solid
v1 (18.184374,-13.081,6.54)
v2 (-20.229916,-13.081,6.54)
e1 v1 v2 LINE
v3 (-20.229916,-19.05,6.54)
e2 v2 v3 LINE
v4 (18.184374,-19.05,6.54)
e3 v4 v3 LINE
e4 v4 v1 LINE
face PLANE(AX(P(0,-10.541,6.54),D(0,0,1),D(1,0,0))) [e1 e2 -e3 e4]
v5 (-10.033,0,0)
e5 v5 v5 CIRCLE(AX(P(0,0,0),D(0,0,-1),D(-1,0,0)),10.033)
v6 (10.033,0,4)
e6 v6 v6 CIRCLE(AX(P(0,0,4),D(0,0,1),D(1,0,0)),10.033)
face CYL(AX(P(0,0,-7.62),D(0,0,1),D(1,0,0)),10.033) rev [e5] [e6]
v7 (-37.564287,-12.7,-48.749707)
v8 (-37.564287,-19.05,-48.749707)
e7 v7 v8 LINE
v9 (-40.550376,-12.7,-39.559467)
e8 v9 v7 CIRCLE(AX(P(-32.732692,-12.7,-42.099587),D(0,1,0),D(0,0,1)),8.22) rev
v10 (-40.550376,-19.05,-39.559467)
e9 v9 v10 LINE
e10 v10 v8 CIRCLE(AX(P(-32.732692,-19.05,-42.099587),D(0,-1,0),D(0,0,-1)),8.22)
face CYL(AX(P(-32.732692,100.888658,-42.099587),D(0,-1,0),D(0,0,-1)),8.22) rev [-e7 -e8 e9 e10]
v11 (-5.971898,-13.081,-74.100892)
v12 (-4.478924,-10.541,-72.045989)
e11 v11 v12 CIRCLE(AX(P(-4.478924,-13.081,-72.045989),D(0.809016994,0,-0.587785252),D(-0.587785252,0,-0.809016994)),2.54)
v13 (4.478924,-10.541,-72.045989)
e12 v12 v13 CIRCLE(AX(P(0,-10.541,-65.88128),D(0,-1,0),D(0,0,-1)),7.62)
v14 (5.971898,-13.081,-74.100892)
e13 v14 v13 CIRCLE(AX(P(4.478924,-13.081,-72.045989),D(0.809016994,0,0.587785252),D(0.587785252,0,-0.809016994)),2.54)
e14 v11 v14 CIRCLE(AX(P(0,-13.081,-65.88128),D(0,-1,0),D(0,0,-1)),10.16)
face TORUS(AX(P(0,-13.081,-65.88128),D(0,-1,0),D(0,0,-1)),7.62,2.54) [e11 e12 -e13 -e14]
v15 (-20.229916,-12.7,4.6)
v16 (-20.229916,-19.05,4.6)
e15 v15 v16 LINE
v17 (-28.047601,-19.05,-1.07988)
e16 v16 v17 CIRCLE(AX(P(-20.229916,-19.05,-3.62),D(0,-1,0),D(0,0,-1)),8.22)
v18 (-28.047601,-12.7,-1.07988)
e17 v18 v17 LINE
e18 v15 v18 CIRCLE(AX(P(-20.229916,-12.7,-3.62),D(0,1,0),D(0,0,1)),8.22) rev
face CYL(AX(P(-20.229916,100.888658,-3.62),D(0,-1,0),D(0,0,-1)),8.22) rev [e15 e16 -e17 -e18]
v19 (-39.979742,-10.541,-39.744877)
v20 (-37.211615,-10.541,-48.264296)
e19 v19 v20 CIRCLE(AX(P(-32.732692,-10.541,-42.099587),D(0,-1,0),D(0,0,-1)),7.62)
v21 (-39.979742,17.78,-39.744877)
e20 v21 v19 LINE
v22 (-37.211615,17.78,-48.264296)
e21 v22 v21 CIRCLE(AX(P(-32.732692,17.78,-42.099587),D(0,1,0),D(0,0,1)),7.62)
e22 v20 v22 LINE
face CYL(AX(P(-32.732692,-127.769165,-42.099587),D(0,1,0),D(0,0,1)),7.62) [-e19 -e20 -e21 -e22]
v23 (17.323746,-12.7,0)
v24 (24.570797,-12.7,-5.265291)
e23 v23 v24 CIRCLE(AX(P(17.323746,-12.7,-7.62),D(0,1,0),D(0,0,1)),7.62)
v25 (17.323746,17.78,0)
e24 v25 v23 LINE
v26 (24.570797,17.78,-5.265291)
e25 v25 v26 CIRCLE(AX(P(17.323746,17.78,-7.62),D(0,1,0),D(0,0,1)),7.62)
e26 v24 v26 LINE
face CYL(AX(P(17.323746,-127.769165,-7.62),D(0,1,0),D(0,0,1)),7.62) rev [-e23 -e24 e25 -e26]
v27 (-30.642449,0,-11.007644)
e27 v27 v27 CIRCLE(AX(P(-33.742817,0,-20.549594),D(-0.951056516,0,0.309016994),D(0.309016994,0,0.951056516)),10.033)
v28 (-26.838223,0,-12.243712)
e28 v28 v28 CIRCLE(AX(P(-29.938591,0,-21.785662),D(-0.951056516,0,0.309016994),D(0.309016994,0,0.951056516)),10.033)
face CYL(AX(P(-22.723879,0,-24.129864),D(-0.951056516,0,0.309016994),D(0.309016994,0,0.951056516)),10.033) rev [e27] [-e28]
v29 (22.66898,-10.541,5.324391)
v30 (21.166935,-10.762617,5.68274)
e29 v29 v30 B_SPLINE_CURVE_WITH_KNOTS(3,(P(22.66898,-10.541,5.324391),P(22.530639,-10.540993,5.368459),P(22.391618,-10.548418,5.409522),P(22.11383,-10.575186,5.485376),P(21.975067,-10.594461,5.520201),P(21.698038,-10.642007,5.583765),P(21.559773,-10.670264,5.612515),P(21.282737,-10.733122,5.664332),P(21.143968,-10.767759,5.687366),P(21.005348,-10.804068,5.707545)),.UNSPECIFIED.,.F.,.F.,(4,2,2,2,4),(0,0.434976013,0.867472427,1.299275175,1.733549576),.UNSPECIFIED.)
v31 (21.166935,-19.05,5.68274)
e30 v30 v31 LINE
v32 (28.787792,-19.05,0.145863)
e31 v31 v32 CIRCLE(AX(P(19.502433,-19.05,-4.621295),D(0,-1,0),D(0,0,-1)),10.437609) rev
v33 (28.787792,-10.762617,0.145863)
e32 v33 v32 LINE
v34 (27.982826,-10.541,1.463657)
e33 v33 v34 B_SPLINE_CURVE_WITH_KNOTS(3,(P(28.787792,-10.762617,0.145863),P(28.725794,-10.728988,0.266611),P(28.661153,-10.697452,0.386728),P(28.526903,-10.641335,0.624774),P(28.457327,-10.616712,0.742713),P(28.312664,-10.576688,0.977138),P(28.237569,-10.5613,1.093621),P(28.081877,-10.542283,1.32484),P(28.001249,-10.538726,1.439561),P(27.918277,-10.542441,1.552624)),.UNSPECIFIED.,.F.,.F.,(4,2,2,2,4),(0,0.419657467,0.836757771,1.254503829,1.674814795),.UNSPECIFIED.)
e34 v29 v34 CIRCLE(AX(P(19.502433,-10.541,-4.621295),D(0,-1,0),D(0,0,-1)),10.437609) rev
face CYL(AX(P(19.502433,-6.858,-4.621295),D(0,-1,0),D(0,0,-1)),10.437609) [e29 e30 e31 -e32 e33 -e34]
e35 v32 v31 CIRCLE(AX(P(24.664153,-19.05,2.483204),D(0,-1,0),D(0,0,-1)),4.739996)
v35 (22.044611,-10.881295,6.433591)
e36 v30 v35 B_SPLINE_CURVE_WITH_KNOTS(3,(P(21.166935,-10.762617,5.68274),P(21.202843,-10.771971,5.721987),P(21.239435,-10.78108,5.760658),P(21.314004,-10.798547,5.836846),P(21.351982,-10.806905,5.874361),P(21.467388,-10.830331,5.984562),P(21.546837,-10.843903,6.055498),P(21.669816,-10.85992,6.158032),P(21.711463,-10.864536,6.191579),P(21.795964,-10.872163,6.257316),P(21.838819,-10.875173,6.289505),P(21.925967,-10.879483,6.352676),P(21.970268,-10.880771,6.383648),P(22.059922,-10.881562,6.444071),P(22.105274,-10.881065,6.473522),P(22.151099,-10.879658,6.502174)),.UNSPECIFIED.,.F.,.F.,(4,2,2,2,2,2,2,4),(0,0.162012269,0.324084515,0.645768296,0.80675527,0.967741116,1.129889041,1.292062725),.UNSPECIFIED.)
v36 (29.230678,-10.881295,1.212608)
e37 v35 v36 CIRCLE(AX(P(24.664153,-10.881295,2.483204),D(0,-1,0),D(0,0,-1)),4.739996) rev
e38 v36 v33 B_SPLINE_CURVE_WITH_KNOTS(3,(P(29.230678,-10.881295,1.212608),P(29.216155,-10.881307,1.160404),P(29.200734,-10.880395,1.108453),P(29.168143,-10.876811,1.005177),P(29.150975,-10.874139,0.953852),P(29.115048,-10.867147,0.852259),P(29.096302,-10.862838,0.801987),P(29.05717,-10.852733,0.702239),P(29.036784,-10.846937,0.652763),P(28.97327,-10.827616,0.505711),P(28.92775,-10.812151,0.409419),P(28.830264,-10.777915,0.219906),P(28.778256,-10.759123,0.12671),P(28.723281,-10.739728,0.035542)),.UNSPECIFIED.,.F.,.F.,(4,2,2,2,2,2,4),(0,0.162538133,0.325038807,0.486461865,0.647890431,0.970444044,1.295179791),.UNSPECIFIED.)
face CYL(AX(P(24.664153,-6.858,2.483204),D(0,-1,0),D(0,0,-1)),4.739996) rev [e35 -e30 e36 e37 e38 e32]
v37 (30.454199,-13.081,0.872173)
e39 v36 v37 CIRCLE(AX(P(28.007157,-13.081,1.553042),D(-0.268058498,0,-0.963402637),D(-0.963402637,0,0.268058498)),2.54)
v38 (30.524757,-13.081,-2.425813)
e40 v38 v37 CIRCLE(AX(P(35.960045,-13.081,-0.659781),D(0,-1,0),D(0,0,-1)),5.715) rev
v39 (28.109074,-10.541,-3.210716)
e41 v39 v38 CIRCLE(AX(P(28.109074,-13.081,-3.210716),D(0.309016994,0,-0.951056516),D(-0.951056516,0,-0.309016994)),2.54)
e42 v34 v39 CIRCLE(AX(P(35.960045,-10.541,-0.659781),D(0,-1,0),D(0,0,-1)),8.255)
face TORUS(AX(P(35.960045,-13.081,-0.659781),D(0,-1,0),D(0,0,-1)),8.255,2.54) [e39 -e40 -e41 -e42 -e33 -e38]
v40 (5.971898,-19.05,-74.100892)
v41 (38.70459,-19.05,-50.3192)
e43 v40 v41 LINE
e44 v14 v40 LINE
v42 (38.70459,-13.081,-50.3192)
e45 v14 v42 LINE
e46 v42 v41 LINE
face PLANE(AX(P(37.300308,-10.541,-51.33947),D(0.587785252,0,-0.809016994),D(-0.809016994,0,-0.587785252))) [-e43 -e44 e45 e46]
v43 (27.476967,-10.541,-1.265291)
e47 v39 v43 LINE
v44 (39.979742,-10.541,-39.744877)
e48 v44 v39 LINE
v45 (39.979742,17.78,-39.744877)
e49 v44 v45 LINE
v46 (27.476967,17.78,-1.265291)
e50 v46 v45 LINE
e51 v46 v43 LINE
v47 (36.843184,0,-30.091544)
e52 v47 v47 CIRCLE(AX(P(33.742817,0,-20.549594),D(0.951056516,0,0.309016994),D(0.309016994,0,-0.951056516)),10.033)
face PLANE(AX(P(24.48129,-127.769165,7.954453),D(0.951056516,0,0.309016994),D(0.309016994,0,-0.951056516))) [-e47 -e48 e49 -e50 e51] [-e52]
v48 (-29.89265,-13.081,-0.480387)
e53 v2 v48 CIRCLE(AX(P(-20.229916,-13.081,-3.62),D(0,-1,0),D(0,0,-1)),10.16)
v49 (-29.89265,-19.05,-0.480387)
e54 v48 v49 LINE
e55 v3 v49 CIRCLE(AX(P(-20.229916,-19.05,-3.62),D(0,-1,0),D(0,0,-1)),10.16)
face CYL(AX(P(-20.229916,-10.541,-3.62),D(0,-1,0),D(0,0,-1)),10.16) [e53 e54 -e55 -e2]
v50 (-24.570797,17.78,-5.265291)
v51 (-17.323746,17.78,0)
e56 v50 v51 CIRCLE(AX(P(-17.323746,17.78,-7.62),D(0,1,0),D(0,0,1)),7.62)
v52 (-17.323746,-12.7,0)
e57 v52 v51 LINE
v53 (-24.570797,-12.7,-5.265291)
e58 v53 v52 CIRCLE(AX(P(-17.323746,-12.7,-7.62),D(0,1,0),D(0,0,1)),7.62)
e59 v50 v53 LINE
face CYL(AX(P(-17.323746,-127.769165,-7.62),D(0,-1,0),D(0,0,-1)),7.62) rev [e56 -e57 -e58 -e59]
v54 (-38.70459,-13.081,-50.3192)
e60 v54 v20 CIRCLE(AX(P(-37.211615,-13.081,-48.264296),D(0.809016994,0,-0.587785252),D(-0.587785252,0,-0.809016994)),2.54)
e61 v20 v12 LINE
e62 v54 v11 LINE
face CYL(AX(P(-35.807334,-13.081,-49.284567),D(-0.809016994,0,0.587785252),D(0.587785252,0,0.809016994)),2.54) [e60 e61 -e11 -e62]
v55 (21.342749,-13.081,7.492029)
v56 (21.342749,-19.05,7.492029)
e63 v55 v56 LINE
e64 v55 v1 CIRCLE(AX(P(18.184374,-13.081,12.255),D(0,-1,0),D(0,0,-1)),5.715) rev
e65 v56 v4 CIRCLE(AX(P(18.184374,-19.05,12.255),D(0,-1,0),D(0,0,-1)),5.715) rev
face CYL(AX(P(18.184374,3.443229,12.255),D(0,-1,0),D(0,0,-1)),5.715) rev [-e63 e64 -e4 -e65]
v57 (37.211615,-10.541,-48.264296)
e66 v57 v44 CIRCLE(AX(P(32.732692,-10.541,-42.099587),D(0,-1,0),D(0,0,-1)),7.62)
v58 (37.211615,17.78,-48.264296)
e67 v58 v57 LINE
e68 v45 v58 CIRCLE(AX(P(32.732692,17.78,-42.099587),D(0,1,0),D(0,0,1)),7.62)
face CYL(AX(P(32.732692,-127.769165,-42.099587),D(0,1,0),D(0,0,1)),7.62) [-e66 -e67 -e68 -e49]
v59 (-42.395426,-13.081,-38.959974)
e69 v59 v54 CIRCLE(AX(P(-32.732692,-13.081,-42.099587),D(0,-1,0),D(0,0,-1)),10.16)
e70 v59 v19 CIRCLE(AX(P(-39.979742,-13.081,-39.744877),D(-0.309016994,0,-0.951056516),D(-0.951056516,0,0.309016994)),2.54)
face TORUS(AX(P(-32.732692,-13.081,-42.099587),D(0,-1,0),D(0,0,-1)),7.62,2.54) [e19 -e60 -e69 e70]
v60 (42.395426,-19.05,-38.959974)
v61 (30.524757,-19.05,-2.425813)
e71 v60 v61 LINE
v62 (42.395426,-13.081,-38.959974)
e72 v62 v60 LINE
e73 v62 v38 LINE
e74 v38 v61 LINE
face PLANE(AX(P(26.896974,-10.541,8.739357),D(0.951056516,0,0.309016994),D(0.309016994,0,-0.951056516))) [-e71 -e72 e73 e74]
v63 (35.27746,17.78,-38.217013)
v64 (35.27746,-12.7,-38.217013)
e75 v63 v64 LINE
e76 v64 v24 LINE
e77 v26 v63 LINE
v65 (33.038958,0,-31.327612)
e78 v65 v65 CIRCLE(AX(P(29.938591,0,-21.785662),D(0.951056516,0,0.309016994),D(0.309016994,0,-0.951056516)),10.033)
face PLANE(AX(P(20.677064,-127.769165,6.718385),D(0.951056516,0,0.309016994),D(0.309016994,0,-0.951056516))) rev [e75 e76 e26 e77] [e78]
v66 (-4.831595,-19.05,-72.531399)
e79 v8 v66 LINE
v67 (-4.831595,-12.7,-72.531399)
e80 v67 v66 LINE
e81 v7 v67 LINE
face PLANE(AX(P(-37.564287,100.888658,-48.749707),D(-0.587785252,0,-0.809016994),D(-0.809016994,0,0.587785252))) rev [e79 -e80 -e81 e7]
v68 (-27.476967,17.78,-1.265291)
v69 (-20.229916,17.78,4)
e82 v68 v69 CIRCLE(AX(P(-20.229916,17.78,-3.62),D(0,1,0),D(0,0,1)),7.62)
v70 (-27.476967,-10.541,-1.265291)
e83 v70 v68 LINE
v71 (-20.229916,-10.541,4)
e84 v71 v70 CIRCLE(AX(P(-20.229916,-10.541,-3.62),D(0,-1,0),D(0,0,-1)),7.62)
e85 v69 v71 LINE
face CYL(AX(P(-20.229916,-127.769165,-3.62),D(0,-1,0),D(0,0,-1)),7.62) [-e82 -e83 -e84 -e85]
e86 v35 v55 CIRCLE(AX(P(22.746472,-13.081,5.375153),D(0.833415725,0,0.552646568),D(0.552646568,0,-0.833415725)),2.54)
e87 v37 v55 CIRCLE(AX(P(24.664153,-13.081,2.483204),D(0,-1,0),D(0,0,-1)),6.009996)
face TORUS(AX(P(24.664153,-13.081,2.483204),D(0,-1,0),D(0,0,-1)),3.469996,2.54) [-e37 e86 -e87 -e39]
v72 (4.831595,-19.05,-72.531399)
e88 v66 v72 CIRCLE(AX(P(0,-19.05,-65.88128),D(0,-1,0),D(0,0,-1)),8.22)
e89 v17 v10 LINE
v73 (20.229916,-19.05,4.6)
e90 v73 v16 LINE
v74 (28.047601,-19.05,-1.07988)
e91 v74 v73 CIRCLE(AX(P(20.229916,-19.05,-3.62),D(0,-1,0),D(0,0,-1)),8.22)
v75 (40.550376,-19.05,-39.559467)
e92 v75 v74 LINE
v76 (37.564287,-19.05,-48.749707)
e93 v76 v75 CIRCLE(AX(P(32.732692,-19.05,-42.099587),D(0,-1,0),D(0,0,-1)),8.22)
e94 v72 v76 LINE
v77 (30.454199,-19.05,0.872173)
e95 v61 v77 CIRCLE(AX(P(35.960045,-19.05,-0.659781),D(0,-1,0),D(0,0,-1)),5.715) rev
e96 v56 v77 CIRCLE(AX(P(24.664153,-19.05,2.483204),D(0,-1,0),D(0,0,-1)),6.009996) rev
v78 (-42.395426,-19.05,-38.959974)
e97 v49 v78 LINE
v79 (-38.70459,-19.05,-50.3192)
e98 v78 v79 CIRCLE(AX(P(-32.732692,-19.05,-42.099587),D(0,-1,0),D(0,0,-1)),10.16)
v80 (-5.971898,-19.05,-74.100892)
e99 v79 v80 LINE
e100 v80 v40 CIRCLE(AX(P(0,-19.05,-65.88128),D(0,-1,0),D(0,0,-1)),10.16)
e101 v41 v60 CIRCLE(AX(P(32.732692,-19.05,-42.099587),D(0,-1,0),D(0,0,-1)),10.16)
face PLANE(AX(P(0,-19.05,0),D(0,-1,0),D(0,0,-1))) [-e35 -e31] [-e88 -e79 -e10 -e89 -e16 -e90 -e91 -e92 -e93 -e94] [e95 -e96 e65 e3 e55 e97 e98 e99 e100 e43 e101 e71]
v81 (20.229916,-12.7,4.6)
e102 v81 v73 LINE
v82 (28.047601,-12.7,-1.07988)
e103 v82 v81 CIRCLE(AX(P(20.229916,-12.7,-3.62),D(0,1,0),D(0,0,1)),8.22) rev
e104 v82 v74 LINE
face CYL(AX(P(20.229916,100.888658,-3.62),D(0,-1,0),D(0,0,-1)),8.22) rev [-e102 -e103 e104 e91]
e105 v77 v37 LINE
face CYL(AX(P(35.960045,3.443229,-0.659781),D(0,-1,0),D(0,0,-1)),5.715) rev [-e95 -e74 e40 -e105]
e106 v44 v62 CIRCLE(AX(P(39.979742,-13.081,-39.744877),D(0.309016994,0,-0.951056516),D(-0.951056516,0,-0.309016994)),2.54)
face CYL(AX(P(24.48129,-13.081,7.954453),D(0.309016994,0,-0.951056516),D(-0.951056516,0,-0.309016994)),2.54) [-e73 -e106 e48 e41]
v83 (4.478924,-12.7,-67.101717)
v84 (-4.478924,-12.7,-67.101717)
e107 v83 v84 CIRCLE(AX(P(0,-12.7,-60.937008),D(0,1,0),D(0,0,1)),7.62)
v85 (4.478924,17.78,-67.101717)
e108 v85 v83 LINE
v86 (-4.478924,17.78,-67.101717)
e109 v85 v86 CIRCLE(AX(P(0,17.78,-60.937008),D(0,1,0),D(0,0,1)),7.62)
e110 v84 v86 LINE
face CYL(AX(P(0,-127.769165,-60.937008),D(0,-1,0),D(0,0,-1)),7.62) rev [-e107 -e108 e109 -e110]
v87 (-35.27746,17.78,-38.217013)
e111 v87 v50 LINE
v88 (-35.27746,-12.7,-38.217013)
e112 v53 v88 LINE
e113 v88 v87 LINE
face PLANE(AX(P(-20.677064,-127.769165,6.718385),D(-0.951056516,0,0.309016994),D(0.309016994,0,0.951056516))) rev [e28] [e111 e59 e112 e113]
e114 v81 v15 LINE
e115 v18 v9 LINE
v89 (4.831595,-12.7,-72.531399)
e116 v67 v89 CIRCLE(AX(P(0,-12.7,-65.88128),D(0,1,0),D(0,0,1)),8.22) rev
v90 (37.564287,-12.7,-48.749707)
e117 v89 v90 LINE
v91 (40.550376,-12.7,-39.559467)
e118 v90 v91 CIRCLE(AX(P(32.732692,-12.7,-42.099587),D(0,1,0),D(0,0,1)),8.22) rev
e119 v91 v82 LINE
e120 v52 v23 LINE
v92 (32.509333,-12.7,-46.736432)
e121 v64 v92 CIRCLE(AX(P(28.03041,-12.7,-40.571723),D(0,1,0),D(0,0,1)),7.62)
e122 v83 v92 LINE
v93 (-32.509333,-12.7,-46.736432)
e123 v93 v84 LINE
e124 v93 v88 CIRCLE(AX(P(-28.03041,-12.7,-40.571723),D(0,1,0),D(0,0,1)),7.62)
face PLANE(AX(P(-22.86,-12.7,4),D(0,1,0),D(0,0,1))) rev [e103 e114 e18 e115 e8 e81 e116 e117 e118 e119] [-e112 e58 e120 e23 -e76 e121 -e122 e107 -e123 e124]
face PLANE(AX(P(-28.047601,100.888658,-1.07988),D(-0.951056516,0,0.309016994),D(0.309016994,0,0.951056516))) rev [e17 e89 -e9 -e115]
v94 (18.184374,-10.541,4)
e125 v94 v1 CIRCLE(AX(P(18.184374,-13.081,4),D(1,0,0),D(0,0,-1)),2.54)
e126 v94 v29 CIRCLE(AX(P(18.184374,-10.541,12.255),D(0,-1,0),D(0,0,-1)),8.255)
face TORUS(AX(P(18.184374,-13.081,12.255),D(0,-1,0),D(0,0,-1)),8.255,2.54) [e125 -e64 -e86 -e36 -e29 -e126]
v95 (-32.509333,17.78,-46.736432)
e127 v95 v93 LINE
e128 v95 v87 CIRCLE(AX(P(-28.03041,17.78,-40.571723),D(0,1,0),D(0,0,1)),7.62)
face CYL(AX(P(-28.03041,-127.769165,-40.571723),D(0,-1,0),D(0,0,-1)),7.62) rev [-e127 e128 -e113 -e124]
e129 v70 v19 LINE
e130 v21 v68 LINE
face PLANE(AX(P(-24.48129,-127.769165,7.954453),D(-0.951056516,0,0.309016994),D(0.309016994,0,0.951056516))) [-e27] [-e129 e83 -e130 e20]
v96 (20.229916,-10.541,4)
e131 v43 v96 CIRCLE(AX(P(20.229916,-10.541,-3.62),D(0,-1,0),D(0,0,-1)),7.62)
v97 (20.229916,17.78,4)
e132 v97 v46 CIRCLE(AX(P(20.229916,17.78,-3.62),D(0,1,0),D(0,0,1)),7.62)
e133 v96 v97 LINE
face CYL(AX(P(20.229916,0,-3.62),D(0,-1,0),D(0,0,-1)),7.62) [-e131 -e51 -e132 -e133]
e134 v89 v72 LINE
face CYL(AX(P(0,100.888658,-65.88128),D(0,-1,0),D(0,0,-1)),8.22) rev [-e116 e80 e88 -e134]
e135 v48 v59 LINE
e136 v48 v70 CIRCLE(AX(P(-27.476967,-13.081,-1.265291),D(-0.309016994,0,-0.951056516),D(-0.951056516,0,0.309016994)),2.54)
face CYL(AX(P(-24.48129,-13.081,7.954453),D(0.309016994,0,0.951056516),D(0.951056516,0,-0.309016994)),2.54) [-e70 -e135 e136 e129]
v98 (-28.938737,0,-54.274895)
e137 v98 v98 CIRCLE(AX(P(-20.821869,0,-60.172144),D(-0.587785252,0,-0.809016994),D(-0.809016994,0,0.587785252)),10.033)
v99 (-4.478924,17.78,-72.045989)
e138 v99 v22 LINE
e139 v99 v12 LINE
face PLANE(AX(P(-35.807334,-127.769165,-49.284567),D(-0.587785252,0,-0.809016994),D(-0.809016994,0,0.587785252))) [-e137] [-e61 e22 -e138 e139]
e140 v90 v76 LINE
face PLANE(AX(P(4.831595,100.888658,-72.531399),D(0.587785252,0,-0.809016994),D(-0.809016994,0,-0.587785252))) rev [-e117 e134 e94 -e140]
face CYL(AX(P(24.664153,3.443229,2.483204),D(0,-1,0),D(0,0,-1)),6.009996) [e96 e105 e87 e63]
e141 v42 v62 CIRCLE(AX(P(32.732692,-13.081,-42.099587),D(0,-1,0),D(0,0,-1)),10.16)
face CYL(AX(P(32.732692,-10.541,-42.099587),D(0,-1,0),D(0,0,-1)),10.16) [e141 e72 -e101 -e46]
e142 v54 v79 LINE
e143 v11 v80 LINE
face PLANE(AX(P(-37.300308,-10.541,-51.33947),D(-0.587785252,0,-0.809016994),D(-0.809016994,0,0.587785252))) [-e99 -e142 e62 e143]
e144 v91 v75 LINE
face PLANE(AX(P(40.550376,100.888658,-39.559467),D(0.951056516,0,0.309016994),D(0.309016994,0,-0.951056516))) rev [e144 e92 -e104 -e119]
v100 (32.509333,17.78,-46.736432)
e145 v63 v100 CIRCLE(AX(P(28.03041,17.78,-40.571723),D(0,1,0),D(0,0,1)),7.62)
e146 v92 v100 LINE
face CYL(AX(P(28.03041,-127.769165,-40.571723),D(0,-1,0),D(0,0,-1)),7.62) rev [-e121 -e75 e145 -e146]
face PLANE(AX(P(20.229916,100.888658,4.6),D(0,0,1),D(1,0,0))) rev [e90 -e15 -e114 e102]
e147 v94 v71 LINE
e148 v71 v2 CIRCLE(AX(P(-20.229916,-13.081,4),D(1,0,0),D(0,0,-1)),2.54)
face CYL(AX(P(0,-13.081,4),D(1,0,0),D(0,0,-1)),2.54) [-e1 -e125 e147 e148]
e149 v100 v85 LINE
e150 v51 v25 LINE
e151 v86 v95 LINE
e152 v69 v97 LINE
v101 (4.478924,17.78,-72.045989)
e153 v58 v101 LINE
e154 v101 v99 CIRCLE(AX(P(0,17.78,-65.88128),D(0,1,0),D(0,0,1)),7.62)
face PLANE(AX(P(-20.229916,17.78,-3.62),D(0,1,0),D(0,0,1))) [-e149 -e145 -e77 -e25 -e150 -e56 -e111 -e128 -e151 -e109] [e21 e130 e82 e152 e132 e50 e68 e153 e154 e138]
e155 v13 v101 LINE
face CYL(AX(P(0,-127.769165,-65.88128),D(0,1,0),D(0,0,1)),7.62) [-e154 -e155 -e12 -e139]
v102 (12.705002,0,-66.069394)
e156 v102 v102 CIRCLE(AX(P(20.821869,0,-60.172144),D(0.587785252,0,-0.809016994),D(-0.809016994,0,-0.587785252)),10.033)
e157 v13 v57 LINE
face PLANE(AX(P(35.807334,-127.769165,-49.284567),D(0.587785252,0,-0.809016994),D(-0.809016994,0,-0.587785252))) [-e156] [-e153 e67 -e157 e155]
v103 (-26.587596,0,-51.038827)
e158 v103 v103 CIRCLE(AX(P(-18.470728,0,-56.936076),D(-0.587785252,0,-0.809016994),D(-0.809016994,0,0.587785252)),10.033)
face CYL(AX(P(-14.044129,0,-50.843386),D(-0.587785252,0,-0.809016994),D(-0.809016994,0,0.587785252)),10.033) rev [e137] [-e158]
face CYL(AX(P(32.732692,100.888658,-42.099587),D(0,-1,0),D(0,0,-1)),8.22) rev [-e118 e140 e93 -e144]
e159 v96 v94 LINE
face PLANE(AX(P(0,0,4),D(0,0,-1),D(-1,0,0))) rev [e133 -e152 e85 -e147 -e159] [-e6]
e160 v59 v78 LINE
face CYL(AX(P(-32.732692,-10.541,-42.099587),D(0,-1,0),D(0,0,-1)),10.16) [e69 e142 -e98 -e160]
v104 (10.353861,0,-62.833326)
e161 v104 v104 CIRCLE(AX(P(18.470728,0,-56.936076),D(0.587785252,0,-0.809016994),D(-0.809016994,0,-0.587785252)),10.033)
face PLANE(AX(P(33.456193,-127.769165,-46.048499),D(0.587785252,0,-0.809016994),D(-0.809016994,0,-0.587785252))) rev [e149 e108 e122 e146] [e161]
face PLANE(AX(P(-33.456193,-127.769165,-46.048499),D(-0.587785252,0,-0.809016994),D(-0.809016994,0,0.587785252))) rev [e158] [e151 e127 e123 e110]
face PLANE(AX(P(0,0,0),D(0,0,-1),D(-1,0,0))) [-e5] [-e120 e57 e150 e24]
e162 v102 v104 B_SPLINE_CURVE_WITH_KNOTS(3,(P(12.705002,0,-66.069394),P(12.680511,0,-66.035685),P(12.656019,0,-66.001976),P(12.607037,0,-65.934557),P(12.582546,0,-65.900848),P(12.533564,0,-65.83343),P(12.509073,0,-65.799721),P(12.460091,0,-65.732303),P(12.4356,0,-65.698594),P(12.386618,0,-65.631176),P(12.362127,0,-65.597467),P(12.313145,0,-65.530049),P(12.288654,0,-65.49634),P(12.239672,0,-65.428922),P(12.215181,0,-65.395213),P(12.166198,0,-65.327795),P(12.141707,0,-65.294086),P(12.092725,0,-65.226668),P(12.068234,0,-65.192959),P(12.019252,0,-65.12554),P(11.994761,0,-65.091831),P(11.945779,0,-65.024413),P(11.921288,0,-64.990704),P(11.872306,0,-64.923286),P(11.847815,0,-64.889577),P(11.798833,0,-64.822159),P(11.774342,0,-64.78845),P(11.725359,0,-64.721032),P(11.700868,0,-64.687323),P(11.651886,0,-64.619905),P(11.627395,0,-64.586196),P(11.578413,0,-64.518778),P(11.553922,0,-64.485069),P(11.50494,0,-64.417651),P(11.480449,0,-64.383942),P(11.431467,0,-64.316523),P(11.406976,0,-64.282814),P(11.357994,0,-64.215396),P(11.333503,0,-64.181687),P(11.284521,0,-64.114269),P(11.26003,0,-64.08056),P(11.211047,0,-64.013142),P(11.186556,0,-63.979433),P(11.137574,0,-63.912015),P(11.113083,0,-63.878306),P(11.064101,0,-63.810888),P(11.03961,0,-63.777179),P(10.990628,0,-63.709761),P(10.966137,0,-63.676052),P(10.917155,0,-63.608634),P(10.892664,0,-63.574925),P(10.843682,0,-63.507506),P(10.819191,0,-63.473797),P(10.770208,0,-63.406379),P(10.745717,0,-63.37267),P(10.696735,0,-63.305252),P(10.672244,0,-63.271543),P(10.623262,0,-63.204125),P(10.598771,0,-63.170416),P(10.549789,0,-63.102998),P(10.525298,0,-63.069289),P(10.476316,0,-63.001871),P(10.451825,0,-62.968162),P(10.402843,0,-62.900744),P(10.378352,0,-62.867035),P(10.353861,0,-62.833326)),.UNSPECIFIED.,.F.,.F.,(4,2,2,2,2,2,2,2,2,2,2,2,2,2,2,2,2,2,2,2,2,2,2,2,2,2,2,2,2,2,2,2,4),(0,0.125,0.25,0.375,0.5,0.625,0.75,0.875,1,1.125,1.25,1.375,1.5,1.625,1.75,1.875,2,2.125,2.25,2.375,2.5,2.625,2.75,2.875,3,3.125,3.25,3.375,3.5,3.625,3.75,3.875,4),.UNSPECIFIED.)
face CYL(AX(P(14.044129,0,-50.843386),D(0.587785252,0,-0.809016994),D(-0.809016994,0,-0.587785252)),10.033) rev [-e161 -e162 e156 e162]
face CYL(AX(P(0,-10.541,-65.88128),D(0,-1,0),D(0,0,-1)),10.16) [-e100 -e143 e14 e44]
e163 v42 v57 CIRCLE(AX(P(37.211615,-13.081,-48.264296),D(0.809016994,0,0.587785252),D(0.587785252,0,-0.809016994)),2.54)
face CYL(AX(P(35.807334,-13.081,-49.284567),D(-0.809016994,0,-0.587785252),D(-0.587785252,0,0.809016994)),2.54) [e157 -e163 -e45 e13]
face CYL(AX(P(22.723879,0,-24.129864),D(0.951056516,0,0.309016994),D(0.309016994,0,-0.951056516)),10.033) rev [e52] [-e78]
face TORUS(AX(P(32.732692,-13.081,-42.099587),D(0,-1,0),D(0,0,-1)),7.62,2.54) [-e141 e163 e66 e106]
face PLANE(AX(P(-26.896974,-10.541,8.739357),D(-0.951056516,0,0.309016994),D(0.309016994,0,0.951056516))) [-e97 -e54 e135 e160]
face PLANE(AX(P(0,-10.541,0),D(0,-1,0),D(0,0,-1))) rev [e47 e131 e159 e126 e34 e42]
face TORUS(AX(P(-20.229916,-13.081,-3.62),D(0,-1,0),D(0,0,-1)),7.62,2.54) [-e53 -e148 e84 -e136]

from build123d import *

# Parameters (mm, degrees)
SKETCH1_W                = 45.72
SKETCH1_H                = 25.4
SKETCH1_R                = 9.75
BOSS_EXTRUDE1_DEPTH      = 4
BOSS_EXTRUDE2_DEPTH      = 25.4
SKETCH3_R                = 10.033
CUT_EXTRUDE1_DEPTH       = 11.62
CIRPATTERN1_COUNT        = 5
FILLET1_R                = 7.62
BOSS_EXTRUDE3_DEPTH      = 5.08
BOSS_EXTRUDE4_DEPTH      = 6.35
BOSS_EXTRUDE4_DEPTH_BACK = 2.159
BOSS_EXTRUDE5_START      = -8.509
BOSS_EXTRUDE5_DEPTH      = 8.509
CUT_EXTRUDE4_DEPTH       = 12.192
FILLET5_R                = 5.715
FILLET6_R                = 2.54
CUT_EXTRUDE5_DEPTH       = 6.35


with BuildPart() as part:
    # Sketch1 → Boss-Extrude1 (new body)
    with BuildSketch(Plane.XY):
        Rectangle(SKETCH1_W, SKETCH1_H)
        Circle(SKETCH1_R, mode=Mode.SUBTRACT)
    extrude(amount=BOSS_EXTRUDE1_DEPTH)

    # Sketch2 → Boss-Extrude2 (add)
    with BuildSketch(Plane(origin=(0, 12.7, 0), x_dir=(1, 0, 0), z_dir=(0, 1, 0))):
        Polygon((36.988256983, 43.482303925), (22.86, 0), (22.86, -4), (25.766170112, -4), (41.690539001, 45.01016797), (0, 75.30011757), (-41.690539001, 45.01016797), (-25.766170112, -4), (-22.86, -4), (-22.86, 0), (-36.988256983, 43.482303925), (0, 70.35584566), align=None)
    extrude(amount=-BOSS_EXTRUDE2_DEPTH)

    # Sketch3 → Cut-Extrude1 (cut)
    with BuildSketch(Plane.XY.offset(4)):
        Circle(SKETCH3_R)
    cut_extrude1 = extrude(amount=-CUT_EXTRUDE1_DEPTH, mode=Mode.SUBTRACT)

    # CirPattern1: Cut-Extrude1 ×5 about axis
    cirpattern1_axis = Axis((0, 12.7, -31.513299997), (0, -1, 0))
    for i in range(1, CIRPATTERN1_COUNT):
        add(cut_extrude1.rotate(cirpattern1_axis, i * 360 / CIRPATTERN1_COUNT), mode=Mode.SUBTRACT)

    # Fillet1
    fillet1_edges = [part.edges().sort_by_distance(p)[0] for p in [
        (0, 0, -75.30011757),
        (41.690539001, 0, -45.01016797),
        (25.766170112, 0, 4),
        (36.988256983, 0, -43.482303925),
        (0, 0, -70.35584566),
        (-36.988256983, 0, -43.482303925),
        (-25.766170112, 0, 4),
        (-41.690539001, 0, -45.01016797),
        (-22.86, 0, 0),
        (22.86, 0, 0),
    ]]
    fillet(fillet1_edges, radius=FILLET1_R)

    # Sketch6 → Boss-Extrude3 (add)
    with BuildSketch(Plane(origin=(0, 12.7, 0), x_dir=(1, 0, 0), z_dir=(0, 1, 0))):
        with BuildLine():
            Line((-20.229916049, -4), (20.229916049, -4))
            ThreePointArc((20.229916049, -4), (24.708839671, -2.544709497), (27.476966703, 1.265290503))
            Line((27.476966703, 1.265290503), (39.97974241, 39.744877467))
            ThreePointArc((39.97974241, 39.744877467), (39.97974241, 44.454296461), (37.211615379, 48.264296461))
            Line((37.211615379, 48.264296461), (4.478923622, 72.045989078))
            ThreePointArc((4.478923622, 72.045989078), (0, 73.501279581), (-4.478923622, 72.045989078))
            Line((-4.478923622, 72.045989078), (-37.211615379, 48.264296461))
            ThreePointArc((-37.211615379, 48.264296461), (-39.97974241, 44.454296461), (-39.97974241, 39.744877467))
            Line((-39.97974241, 39.744877467), (-27.476966703, 1.265290503))
            ThreePointArc((-27.476966703, 1.265290503), (-24.708839671, -2.544709497), (-20.229916049, -4))
        make_face()
        with BuildLine():
            Line((24.570796591, 5.265290503), (35.277460392, 38.217013422))
            ThreePointArc((35.277460392, 38.217013422), (35.277460392, 42.926432416), (32.50933336, 46.736432416))
            Line((32.50933336, 46.736432416), (4.478923622, 67.101717168))
            ThreePointArc((4.478923622, 67.101717168), (0, 68.557007671), (-4.478923622, 67.101717168))
            Line((-4.478923622, 67.101717168), (-32.50933336, 46.736432416))
            ThreePointArc((-32.50933336, 46.736432416), (-35.277460392, 42.926432416), (-35.277460392, 38.217013422))
            Line((-35.277460392, 38.217013422), (-24.570796591, 5.265290503))
            ThreePointArc((-24.570796591, 5.265290503), (-21.802669559, 1.455290503), (-17.323745937, 0))
            Line((-17.323745937, 0), (17.323745937, 0))
            ThreePointArc((17.323745937, 0), (21.802669559, 1.455290503), (24.570796591, 5.265290503))
        make_face(mode=Mode.SUBTRACT)
    extrude(amount=BOSS_EXTRUDE3_DEPTH)

    # Sketch8 → Boss-Extrude4 (add, two sides: drawn at the far end of the back side and taken through both)
    with BuildSketch(Plane.XZ.offset(12.7).offset(-BOSS_EXTRUDE4_DEPTH_BACK)):
        with BuildLine():
            Line((5.971898163, -74.100892244), (38.70458992, -50.319199627))
            ThreePointArc((38.70458992, -50.319199627), (42.395425962, -45.239199627), (42.395425962, -38.959974301))
            Line((42.395425962, -38.959974301), (29.892650254, -0.480387337))
            ThreePointArc((29.892650254, -0.480387337), (26.201814212, 4.599612663), (20.229916049, 6.54))
            Line((20.229916049, 6.54), (-20.229916049, 6.54))
            ThreePointArc((-20.229916049, 6.54), (-26.201814212, 4.599612663), (-29.892650254, -0.480387337))
            Line((-29.892650254, -0.480387337), (-42.395425962, -38.959974301))
            ThreePointArc((-42.395425962, -38.959974301), (-42.395425962, -45.239199627), (-38.70458992, -50.319199627))
            Line((-38.70458992, -50.319199627), (-5.971898163, -74.100892244))
            ThreePointArc((-5.971898163, -74.100892244), (0, -76.041279581), (5.971898163, -74.100892244))
        make_face()
        with BuildLine():
            Line((39.97974241, -39.744877467), (27.476966703, -1.265290503))
            ThreePointArc((27.476966703, -1.265290503), (24.708839671, 2.544709497), (20.229916049, 4))
            Line((20.229916049, 4), (-20.229916049, 4))
            ThreePointArc((-20.229916049, 4), (-24.708839671, 2.544709497), (-27.476966703, -1.265290503))
            Line((-27.476966703, -1.265290503), (-39.97974241, -39.744877467))
            ThreePointArc((-39.97974241, -39.744877467), (-39.97974241, -44.454296461), (-37.211615379, -48.264296461))
            Line((-37.211615379, -48.264296461), (-4.478923622, -72.045989078))
            ThreePointArc((-4.478923622, -72.045989078), (0, -73.501279581), (4.478923622, -72.045989078))
            Line((4.478923622, -72.045989078), (37.211615379, -48.264296461))
            ThreePointArc((37.211615379, -48.264296461), (39.97974241, -44.454296461), (39.97974241, -39.744877467))
        make_face(mode=Mode.SUBTRACT)
    extrude(amount=BOSS_EXTRUDE4_DEPTH + BOSS_EXTRUDE4_DEPTH_BACK)

    # Sketch11 → Boss-Extrude5 (add)
    with BuildSketch(Plane.XZ.offset(19.05).offset(BOSS_EXTRUDE5_START)):
        with BuildLine():
            Line((19.948787859, 5.414930333), (27.190045273, 1.56775587))
            Line((27.190045273, 1.56775587), (29.892650254, -0.480387337))
            ThreePointArc((29.892650254, -0.480387337), (26.201814212, 4.599612663), (20.229916049, 6.54))
            Line((20.229916049, 6.54), (19.948787859, 5.414930333))
        make_face()
        with BuildLine():
            ThreePointArc((20.229916049, 6.54), (28.196740294, 7.345392854), (29.892650254, -0.480387337))
            ThreePointArc((29.892650254, -0.480387337), (26.201814212, 4.599612663), (20.229916049, 6.54))
        make_face()
    extrude(amount=BOSS_EXTRUDE5_DEPTH)

    # Sketch12 → Cut-Extrude4 (cut)
    with BuildSketch(Plane.XZ.offset(19.05)):
        with BuildLine():
            ThreePointArc((28.787792432, 0.145862767), (27.450253023, 6.317941272), (21.166935135, 5.682739694))
            ThreePointArc((21.166935135, 5.682739694), (25.637505825, 3.822908801), (28.787792432, 0.145862767))
        make_face()
    extrude(amount=-CUT_EXTRUDE4_DEPTH, mode=Mode.SUBTRACT)

    # Fillet5
    fillet5_edges = [part.edges().sort_by_distance(p)[0] for p in [
        (20.229916049, -14.7955, 6.54),
        (29.892650254, -14.7955, -0.480387337),
    ]]
    fillet(fillet5_edges, radius=FILLET5_R)

    # Fillet6
    # the kernel refuses this fillet: 2.54 mm, written as the material it takes off along each edge
    with BuildSketch(Plane(origin=(32.732691756, -10.541, -42.099586964), x_dir=(0.5877852522924727, 0, -0.8090169943749478), z_dir=(-0.8090169943749478, 0, -0.5877852522924727))) as fillet6_piece_1:
        with BuildLine():
            CenterArc((10.16 - FILLET6_R, FILLET6_R), FILLET6_R, 270, 90)
            Line((10.16 - FILLET6_R, 0), (10.16, 0))
            Line((10.16, 0), (10.16, FILLET6_R))
        make_face()
    revolve(axis=Axis((32.732691756, -10.541, -42.099586964), (0, -1, 0)), revolution_arc=72, mode=Mode.SUBTRACT)
    with BuildSketch(Plane(origin=(5.971898163, -10.541, -74.100892244), x_dir=(0, -1, 0), z_dir=(0.8090169943749487, 0, 0.5877852522924716)), Plane(origin=(-38.70458992, -10.541, -50.319199627), x_dir=(0, -1, 0), z_dir=(0.8090169943749469, 0, -0.5877852522924739)), Plane(origin=(-29.892650254, -10.541, -0.480387337), x_dir=(0, -1, 0), z_dir=(-0.30901699437495056, 0, -0.9510565162951526))) as fillet6_piece_2:
        with BuildLine():
            CenterArc((FILLET6_R, -FILLET6_R), FILLET6_R, 90, 90)
            Line((0, -FILLET6_R), (0, 0))
            Line((0, 0), (FILLET6_R, 0))
        make_face()
    extrude(amount=40.459832097, mode=Mode.SUBTRACT)
    with BuildSketch(Plane(origin=(0, -10.541, -65.881279581), x_dir=(-0.5877852522924719, 0, -0.8090169943749482), z_dir=(-0.8090169943749482, 0, 0.5877852522924719))) as fillet6_piece_3:
        with BuildLine():
            CenterArc((10.16 - FILLET6_R, FILLET6_R), FILLET6_R, 270, 90)
            Line((10.16 - FILLET6_R, 0), (10.16, 0))
            Line((10.16, 0), (10.16, FILLET6_R))
        make_face()
    revolve(axis=Axis((0, -10.541, -65.881279581), (0, -1, 0)), revolution_arc=72, mode=Mode.SUBTRACT)
    with BuildSketch(Plane(origin=(-32.732691756, -10.541, -42.099586964), x_dir=(-0.9510565162951528, 0, 0.3090169943749496), z_dir=(0.3090169943749496, 0, 0.9510565162951528))) as fillet6_piece_4:
        with BuildLine():
            CenterArc((10.16 - FILLET6_R, FILLET6_R), FILLET6_R, 270, 90)
            Line((10.16 - FILLET6_R, 0), (10.16, 0))
            Line((10.16, 0), (10.16, FILLET6_R))
        make_face()
    revolve(axis=Axis((-32.732691756, -10.541, -42.099586964), (0, -1, 0)), revolution_arc=72, mode=Mode.SUBTRACT)
    with BuildSketch(Plane(origin=(-20.229916049, -10.541, -3.62), x_dir=(0, 0, 1), z_dir=(1, 0, 0))) as fillet6_piece_5:
        with BuildLine():
            CenterArc((10.16 - FILLET6_R, FILLET6_R), FILLET6_R, 270, 90)
            Line((10.16 - FILLET6_R, 0), (10.16, 0))
            Line((10.16, 0), (10.16, FILLET6_R))
        make_face()
    revolve(axis=Axis((-20.229916049, -10.541, -3.62), (0, -1, 0)), revolution_arc=72, mode=Mode.SUBTRACT)
    with BuildSketch(Plane(origin=(18.184374257, -10.541, 6.54), x_dir=(0, -1, 0), z_dir=(-1, 0, 0)), Plane(origin=(42.395425962, -10.541, -38.959974301), x_dir=(0, -1, 0), z_dir=(-0.30901699437494484, 0, 0.9510565162951544))) as fillet6_piece_6:
        with BuildLine():
            CenterArc((FILLET6_R, -FILLET6_R), FILLET6_R, 90, 90)
            Line((0, -FILLET6_R), (0, 0))
            Line((0, 0), (FILLET6_R, 0))
        make_face()
    extrude(amount=38.414290306, mode=Mode.SUBTRACT)
    with BuildSketch(Plane(origin=(18.184374257, -10.541, 12.255), x_dir=(0.5526465683039506, 0, -0.8334157249187628), z_dir=(0.8334157249187628, 0, 0.5526465683039506))) as fillet6_piece_7:
        with BuildLine():
            CenterArc((5.715 + FILLET6_R, -FILLET6_R), FILLET6_R, 90, 90)
            Line((5.715 + FILLET6_R, 0), (5.715, 0))
            Line((5.715, 0), (5.715, -FILLET6_R))
        make_face()
    revolve(axis=Axis((18.184374257, -10.541, 12.255), (0, 1, 0)), revolution_arc=33.548768752, mode=Mode.SUBTRACT)
    with BuildSketch(Plane(origin=(35.960045421, -10.541, -0.659781065), x_dir=(-0.9510565162951543, 0, -0.30901699437494495), z_dir=(0.30901699437494495, 0, -0.9510565162951543))) as fillet6_piece_8:
        with BuildLine():
            CenterArc((5.715 + FILLET6_R, -FILLET6_R), FILLET6_R, 90, 90)
            Line((5.715 + FILLET6_R, 0), (5.715, 0))
            Line((5.715, 0), (5.715, -FILLET6_R))
        make_face()
    revolve(axis=Axis((35.960045421, -10.541, -0.659781065), (0, 1, 0)), revolution_arc=33.548768752, mode=Mode.SUBTRACT)
    with BuildSketch(Plane(origin=(24.664153166, -10.541, 2.483203799), x_dir=(-0.5526465683039513, 0, 0.8334157249187624), z_dir=(-0.8334157249187624, 0, -0.5526465683039513))) as fillet6_piece_9:
        with BuildLine():
            CenterArc((6.009996192 - FILLET6_R, -FILLET6_R), FILLET6_R, 0, 90)
            Line((6.009996192 - FILLET6_R, 0), (6.009996192, 0))
            Line((6.009996192, 0), (6.009996192, -FILLET6_R))
        make_face()
    revolve(axis=Axis((24.664153166, -10.541, 2.483203799), (0, 1, 0)), revolution_arc=139.097537505, mode=Mode.SUBTRACT)

    # Sketch13 → Cut-Extrude5 (cut)
    # profile 1 of 2: a face of its own
    with BuildSketch(Plane.XZ.offset(19.05)):
        with BuildLine():
            Line((20.229916049, 4.6), (-20.229916049, 4.6))
            ThreePointArc((-20.229916049, 4.6), (-25.061510822, 3.030119694), (-28.047600613, -1.079880306))
            Line((-28.047600613, -1.079880306), (-40.55037632, -39.559467271))
            ThreePointArc((-40.55037632, -39.559467271), (-40.55037632, -44.639706658), (-37.56428653, -48.749706658))
            Line((-37.56428653, -48.749706658), (-4.831594774, -72.531399275))
            ThreePointArc((-4.831594774, -72.531399275), (0, -74.101279581), (4.831594774, -72.531399275))
            Line((4.831594774, -72.531399275), (37.56428653, -48.749706658))
            ThreePointArc((37.56428653, -48.749706658), (40.55037632, -44.639706658), (40.55037632, -39.559467271))
            Line((40.55037632, -39.559467271), (28.047600613, -1.079880306))
            ThreePointArc((28.047600613, -1.079880306), (25.061510822, 3.030119694), (20.229916049, 4.6))
        make_face()
        with BuildLine():
            Line((39.97974241, -39.744877467), (27.476966703, -1.265290503))
            ThreePointArc((27.476966703, -1.265290503), (24.708839671, 2.544709497), (20.229916049, 4))
            Line((20.229916049, 4), (-20.229916049, 4))
            ThreePointArc((-20.229916049, 4), (-24.708839671, 2.544709497), (-27.476966703, -1.265290503))
            Line((-27.476966703, -1.265290503), (-39.97974241, -39.744877467))
            ThreePointArc((-39.97974241, -39.744877467), (-39.97974241, -44.454296461), (-37.211615379, -48.264296461))
            Line((-37.211615379, -48.264296461), (-4.478923622, -72.045989078))
            ThreePointArc((-4.478923622, -72.045989078), (0, -73.501279581), (4.478923622, -72.045989078))
            Line((4.478923622, -72.045989078), (37.211615379, -48.264296461))
            ThreePointArc((37.211615379, -48.264296461), (39.97974241, -44.454296461), (39.97974241, -39.744877467))
        make_face(mode=Mode.SUBTRACT)
    # profile 2 of 2: a face of its own
    with BuildSketch(Plane.XZ.offset(19.05)):
        with BuildLine():
            ThreePointArc((28.787792432, 0.145862767), (27.450253023, 6.317941272), (21.166935135, 5.682739694))
            ThreePointArc((21.166935135, 5.682739694), (25.637505825, 3.822908801), (28.787792432, 0.145862767))
        make_face()
    extrude(amount=-CUT_EXTRUDE5_DEPTH, mode=Mode.SUBTRACT)


solid = part.part
